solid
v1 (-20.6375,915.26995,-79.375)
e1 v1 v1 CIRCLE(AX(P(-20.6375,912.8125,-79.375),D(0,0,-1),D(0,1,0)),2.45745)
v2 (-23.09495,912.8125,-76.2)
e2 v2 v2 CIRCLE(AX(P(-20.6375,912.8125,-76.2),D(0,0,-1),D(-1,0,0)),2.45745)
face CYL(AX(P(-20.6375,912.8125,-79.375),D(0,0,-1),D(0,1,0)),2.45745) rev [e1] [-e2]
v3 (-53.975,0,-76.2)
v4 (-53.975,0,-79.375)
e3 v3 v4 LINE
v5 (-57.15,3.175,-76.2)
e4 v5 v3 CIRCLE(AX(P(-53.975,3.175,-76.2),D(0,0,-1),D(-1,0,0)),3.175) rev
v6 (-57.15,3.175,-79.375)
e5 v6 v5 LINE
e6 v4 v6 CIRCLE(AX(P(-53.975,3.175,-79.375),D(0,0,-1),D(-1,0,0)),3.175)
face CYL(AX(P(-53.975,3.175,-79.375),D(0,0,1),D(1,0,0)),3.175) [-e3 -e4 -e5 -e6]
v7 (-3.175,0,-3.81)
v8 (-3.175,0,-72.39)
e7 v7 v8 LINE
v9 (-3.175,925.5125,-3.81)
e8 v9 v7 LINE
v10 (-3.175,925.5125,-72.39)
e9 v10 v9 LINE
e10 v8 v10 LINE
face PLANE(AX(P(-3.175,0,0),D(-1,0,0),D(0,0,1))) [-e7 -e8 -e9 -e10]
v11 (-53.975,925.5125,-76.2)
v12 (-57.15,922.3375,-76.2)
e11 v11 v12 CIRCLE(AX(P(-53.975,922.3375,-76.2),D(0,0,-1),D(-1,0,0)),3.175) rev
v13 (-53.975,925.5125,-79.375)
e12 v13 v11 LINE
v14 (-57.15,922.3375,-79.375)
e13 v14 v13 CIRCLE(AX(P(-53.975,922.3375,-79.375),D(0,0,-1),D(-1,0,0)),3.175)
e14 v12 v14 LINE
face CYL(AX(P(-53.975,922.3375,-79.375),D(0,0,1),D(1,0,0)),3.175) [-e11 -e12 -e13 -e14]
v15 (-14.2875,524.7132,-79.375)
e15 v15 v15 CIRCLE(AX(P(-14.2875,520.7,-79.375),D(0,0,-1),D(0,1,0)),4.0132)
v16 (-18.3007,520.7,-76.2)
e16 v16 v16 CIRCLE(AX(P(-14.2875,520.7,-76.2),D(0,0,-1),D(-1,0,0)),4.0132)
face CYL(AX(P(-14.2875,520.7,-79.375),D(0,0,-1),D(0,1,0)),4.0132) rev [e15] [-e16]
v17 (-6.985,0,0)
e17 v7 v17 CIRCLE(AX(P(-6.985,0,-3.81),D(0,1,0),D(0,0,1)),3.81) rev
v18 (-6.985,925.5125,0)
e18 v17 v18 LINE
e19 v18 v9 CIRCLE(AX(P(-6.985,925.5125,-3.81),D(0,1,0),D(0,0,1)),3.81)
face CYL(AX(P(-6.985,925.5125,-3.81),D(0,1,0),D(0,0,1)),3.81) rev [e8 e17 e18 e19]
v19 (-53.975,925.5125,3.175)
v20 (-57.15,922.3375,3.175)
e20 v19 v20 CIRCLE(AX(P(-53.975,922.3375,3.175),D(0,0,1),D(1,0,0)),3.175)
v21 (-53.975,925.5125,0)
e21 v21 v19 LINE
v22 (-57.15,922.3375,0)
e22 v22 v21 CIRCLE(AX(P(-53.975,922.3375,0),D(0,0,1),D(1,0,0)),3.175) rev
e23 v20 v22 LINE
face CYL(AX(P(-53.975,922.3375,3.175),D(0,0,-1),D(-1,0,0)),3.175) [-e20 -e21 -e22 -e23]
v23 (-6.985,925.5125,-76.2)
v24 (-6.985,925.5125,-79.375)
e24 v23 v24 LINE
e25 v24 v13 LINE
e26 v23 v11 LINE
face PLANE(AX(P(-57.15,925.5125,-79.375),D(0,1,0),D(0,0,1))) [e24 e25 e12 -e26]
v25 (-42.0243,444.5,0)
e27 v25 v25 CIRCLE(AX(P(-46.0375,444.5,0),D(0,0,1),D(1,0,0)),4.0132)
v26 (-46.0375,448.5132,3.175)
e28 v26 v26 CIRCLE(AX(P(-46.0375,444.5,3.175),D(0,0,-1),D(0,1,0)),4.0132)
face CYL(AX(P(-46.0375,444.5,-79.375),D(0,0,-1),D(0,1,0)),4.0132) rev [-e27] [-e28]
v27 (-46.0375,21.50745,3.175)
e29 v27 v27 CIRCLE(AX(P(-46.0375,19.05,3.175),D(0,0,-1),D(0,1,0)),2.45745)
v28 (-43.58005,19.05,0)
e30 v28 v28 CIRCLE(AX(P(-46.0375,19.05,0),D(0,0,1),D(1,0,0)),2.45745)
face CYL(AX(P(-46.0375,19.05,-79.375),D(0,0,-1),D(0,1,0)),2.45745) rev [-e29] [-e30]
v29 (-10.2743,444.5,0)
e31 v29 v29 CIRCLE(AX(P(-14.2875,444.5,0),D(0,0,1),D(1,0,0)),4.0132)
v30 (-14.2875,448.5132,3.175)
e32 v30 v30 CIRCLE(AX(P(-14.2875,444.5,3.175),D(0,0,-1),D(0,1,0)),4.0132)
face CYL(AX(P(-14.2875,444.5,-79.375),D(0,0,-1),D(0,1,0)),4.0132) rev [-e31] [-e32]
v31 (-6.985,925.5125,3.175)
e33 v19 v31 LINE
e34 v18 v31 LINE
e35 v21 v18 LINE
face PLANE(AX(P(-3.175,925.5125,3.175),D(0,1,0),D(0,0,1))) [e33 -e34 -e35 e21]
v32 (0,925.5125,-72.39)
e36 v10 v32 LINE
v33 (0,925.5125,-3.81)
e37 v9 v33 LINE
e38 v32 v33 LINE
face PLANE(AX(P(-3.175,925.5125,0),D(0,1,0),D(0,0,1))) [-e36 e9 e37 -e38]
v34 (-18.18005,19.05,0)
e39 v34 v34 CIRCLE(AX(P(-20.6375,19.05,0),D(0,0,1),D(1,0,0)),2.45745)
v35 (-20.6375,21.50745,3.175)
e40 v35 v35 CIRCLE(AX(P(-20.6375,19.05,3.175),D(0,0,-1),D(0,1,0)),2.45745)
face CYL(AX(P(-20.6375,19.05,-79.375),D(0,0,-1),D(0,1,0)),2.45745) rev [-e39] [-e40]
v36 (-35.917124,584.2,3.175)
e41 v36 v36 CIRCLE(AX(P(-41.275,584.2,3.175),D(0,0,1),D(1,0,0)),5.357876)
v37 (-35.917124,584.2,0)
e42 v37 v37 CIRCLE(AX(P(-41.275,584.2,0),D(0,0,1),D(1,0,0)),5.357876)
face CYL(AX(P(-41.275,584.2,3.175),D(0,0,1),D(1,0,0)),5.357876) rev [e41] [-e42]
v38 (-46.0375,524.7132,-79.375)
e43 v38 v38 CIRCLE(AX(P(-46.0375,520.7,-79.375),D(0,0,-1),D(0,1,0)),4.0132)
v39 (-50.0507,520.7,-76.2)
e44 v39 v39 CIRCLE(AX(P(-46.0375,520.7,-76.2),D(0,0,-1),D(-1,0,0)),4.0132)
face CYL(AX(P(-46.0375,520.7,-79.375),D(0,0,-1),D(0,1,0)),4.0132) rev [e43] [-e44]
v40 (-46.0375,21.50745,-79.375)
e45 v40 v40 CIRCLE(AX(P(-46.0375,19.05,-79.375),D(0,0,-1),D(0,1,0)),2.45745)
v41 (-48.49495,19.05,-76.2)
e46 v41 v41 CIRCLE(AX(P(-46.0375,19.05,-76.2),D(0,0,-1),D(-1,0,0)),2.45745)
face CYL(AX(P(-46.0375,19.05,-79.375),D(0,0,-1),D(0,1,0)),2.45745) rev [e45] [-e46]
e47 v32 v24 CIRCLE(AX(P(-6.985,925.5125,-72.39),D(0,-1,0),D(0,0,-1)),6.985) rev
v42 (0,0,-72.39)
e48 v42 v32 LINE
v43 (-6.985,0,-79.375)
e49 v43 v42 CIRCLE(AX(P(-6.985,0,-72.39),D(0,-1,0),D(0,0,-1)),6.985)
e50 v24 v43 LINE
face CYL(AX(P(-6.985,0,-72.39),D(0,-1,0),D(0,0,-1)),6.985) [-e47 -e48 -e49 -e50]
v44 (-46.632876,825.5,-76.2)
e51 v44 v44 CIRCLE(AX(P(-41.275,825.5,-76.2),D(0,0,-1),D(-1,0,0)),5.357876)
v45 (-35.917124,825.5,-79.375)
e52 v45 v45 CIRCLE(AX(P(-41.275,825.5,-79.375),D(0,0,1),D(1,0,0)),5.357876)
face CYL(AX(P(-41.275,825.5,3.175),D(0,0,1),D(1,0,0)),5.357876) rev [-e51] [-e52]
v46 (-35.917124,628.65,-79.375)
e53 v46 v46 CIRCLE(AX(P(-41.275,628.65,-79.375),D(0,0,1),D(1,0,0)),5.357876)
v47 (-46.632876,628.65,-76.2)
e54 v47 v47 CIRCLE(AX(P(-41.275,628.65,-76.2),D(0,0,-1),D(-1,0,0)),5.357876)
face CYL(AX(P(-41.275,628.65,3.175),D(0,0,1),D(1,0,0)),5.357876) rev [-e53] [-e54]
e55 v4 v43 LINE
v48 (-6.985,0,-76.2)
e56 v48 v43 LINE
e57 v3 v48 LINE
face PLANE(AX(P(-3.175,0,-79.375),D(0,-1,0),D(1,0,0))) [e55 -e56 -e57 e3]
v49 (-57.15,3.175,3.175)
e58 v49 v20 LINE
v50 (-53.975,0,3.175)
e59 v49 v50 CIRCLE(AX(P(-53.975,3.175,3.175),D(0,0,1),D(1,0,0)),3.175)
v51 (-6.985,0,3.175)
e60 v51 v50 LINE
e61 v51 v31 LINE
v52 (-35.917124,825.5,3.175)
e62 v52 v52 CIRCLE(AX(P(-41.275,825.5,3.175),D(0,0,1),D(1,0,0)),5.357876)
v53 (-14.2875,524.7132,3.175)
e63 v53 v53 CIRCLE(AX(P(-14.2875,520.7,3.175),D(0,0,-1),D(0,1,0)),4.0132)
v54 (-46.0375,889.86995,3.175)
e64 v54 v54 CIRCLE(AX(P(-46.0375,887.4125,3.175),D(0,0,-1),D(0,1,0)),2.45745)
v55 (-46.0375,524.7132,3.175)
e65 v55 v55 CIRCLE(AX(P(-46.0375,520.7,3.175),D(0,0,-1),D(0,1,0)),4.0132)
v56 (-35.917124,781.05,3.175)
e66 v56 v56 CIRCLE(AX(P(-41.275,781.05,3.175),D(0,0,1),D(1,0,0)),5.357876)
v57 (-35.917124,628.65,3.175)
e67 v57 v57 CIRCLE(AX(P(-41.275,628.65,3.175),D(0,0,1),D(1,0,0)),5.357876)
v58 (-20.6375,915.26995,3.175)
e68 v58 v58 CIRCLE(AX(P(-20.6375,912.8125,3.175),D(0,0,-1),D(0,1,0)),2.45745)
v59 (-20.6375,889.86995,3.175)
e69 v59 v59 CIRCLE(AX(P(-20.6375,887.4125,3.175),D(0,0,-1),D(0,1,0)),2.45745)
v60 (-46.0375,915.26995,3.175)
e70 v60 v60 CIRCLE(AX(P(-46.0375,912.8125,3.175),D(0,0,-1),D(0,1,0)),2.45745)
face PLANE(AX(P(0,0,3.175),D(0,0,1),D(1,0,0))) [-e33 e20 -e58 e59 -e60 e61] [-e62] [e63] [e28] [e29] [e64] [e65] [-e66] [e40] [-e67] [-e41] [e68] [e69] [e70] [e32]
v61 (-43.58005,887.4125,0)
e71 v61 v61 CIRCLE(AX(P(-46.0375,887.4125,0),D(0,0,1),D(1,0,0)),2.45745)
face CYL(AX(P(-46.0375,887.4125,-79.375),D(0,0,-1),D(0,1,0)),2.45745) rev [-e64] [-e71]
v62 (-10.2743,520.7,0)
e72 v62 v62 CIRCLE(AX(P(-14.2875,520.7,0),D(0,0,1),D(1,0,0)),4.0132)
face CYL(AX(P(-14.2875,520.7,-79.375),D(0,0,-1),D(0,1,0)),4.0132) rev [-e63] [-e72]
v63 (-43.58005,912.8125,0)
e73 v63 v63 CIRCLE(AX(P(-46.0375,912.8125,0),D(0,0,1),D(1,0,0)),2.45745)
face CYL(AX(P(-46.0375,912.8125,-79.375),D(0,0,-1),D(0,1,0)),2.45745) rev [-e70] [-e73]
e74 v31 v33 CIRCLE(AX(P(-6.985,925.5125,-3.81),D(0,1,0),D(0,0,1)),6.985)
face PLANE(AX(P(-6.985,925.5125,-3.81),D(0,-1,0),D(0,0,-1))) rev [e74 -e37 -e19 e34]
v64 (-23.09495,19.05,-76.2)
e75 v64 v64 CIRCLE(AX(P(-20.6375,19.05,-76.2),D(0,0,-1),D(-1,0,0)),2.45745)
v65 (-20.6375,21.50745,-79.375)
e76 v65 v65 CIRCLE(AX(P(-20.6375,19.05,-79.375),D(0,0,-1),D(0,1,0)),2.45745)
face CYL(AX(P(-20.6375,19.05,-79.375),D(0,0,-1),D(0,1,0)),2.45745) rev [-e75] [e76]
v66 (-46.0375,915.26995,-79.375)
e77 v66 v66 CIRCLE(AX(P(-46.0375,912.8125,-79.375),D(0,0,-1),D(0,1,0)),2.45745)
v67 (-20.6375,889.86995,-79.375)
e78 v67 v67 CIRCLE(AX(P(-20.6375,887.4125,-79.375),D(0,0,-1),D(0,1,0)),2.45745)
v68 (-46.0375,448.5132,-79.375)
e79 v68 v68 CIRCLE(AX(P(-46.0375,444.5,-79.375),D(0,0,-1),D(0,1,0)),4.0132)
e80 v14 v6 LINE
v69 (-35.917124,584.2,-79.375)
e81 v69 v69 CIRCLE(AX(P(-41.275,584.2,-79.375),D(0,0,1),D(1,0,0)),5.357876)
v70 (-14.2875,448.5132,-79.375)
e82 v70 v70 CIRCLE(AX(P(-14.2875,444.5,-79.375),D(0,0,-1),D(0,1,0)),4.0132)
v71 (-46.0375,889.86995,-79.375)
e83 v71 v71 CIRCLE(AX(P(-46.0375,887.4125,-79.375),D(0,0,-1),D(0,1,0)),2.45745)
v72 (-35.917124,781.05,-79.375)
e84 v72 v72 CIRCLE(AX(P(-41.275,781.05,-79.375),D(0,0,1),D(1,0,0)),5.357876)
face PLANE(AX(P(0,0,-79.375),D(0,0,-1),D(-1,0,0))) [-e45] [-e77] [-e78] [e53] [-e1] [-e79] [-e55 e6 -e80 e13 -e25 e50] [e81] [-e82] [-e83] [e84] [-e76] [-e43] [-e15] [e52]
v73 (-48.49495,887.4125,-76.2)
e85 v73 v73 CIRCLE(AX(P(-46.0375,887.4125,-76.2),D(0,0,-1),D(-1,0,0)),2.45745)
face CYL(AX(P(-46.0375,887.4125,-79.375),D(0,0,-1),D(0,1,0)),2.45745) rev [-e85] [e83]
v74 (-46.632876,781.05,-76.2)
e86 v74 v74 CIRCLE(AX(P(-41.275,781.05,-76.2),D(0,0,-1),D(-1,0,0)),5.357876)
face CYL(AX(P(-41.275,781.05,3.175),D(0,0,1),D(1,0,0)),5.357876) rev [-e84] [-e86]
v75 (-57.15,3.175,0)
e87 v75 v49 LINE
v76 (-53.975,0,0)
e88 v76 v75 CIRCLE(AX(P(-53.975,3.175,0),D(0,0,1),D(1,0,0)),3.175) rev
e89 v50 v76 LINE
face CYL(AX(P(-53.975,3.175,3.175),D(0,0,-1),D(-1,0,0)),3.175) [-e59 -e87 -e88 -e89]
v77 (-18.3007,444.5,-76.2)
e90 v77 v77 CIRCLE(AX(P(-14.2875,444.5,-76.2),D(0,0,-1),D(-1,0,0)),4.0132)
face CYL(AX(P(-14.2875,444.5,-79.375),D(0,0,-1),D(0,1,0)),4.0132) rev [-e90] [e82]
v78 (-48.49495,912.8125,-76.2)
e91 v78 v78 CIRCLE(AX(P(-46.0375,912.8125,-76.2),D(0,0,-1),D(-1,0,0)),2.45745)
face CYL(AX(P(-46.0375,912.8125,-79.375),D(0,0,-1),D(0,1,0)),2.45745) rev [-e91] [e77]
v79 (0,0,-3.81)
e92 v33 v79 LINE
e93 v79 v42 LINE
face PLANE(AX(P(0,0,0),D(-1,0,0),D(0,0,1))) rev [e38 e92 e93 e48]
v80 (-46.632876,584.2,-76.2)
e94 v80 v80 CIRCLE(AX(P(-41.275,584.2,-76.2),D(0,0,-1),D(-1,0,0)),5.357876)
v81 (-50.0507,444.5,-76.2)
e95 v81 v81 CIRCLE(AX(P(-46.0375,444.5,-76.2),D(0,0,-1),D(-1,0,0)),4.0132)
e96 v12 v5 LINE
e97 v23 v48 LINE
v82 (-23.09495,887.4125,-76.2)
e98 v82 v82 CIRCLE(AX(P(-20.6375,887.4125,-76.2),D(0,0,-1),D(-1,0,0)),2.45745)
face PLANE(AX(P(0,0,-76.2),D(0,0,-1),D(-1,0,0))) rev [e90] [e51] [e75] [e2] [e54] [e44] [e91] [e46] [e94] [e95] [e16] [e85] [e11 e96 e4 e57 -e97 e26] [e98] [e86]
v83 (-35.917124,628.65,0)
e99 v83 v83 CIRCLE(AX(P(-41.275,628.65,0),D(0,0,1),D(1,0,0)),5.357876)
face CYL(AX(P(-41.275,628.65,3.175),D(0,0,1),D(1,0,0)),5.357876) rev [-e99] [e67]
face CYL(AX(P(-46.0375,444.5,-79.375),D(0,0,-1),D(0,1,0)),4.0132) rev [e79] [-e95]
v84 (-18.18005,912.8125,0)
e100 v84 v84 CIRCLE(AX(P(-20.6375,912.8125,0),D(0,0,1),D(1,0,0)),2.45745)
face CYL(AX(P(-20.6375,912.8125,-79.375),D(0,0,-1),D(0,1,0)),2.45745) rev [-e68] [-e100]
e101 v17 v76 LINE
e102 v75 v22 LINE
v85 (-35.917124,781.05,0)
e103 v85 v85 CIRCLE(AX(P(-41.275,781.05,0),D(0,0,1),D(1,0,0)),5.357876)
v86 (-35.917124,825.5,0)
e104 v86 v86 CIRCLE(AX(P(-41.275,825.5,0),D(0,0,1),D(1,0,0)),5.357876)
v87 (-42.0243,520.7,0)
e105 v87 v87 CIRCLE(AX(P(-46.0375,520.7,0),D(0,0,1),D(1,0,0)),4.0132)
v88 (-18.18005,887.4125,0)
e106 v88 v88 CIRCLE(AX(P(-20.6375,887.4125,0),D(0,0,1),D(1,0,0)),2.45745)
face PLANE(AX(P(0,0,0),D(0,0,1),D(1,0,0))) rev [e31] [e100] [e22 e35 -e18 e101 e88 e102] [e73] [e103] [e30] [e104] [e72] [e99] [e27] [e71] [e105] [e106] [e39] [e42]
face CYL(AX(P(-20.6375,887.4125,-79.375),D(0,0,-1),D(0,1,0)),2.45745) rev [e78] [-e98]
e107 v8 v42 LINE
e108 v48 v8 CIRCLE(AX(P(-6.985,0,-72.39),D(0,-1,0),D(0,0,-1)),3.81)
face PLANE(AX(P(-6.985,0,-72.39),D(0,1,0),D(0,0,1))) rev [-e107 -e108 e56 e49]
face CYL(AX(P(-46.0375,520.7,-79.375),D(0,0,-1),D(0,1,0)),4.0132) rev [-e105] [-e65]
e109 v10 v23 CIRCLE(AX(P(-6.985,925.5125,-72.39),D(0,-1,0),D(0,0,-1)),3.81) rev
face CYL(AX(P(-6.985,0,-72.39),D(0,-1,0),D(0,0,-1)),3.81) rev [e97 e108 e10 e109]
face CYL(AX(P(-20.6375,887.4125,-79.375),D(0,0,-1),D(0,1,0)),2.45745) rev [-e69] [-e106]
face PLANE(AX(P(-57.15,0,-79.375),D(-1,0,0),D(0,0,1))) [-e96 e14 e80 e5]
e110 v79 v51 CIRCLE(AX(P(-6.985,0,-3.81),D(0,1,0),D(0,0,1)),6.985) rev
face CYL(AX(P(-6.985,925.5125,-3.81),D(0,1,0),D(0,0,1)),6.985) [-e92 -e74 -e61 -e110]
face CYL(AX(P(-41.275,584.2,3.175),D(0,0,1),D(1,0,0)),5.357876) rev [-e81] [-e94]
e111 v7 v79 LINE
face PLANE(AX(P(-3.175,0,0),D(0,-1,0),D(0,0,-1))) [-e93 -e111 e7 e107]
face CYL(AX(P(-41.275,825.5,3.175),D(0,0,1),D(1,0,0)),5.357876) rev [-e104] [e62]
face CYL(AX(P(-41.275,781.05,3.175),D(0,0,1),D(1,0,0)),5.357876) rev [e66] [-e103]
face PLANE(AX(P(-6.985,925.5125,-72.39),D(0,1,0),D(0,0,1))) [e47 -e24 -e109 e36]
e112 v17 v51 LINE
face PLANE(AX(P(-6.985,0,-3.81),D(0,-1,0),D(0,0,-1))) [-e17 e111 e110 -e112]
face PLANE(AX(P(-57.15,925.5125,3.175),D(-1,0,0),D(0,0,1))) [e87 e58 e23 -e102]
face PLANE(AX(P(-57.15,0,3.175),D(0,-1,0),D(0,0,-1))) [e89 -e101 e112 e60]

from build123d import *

# Parameters (mm, degrees)
SKETCH1_W                        = 76.2
SKETCH1_H                        = 925.5125
BASE_FLANGE1_DEPTH               = 3.175
EDGE_FLANGE1_STRIP_W             = 20.32
EDGE_FLANGE1_STRIP_H             = 3.175
EDGE_FLANGE1_STRIP_CUT_DEPTH     = 925.5125
EDGE_FLANGE1_DEPTH               = 925.5125
EDGE_FLANGE2_STRIP_W             = 20.32
EDGE_FLANGE2_STRIP_H             = 3.175
EDGE_FLANGE2_STRIP_CUT_DEPTH     = 925.5125
EDGE_FLANGE2_DEPTH               = 925.5125
F_10_0_1935_DIAMETER_HOLE2_D     = 4.9149
F_10_0_1935_DIAMETER_HOLE1_D     = 4.9149
FILLET1_R                        = 3.175
O_0_316_DIAMETER_HOLE1_D         = 8.0264
F_27_64_0_42188_DIAMETER_HOLE1_D = 10.715752


# Sheet-metal steps are written as plain solids
with BuildPart() as part:
    # Sketch1 → Base-Flange1 (new body)
    with BuildSketch(Plane(origin=(0, 0, 0), x_dir=(0, 0, -1), z_dir=(1, 0, 0))):
        with Locations((38.1, 462.75625)):
            Rectangle(SKETCH1_W, SKETCH1_H)
    extrude(amount=-BASE_FLANGE1_DEPTH)

    # Edge-Flange1 strip (across the edge) → Edge-Flange1 strip cut (cut)
    with BuildSketch(Plane(origin=(-3.175, 0, 0), x_dir=(0, 0, -1), z_dir=(0, 1, 0))):
        with Locations((-6.35, -1.5875)):
            Rectangle(EDGE_FLANGE1_STRIP_W, EDGE_FLANGE1_STRIP_H)
    extrude(amount=EDGE_FLANGE1_STRIP_CUT_DEPTH, mode=Mode.SUBTRACT)

    # Edge-Flange1 section (across the edge) → Edge-Flange1 (add)
    with BuildSketch(Plane(origin=(-3.175, 0, 0), x_dir=(0, 0, -1), z_dir=(0, 1, 0))):
        with BuildLine():
            Line((-3.175, 3.81), (-3.175, 53.975))
            Line((-3.175, 53.975), (0, 53.975))
            Line((0, 53.975), (0, 3.81))
            ThreePointArc((0, 3.81), (1.115923164, 1.115923164), (3.81, 0))
            Line((3.81, 0), (3.81, -3.175))
            ThreePointArc((3.81, -3.175), (-1.129140867, -1.129140867), (-3.175, 3.81))
        make_face()
    extrude(amount=EDGE_FLANGE1_DEPTH)

    # Edge-Flange2 strip (across the edge) → Edge-Flange2 strip cut (cut)
    with BuildSketch(Plane(origin=(-3.175, 925.5125, -76.2), x_dir=(0, 0, 1), z_dir=(0, -1, 0))):
        with Locations((-6.35, -1.5875)):
            Rectangle(EDGE_FLANGE2_STRIP_W, EDGE_FLANGE2_STRIP_H)
    extrude(amount=EDGE_FLANGE2_STRIP_CUT_DEPTH, mode=Mode.SUBTRACT)

    # Edge-Flange2 section (across the edge) → Edge-Flange2 (add)
    with BuildSketch(Plane(origin=(-3.175, 925.5125, -76.2), x_dir=(0, 0, 1), z_dir=(0, -1, 0))):
        with BuildLine():
            Line((-3.175, 3.81), (-3.175, 53.975))
            Line((-3.175, 53.975), (0, 53.975))
            Line((0, 53.975), (0, 3.81))
            ThreePointArc((0, 3.81), (1.115923164, 1.115923164), (3.81, 0))
            Line((3.81, 0), (3.81, -3.175))
            ThreePointArc((3.81, -3.175), (-1.129140867, -1.129140867), (-3.175, 3.81))
        make_face()
    extrude(amount=EDGE_FLANGE2_DEPTH)

    # #10 (0.1935) Diameter Hole2 (through all)
    with Locations(Plane(origin=(0, 0, -79.375), x_dir=(-1, 0, 0), z_dir=(0, 0, -1))):
        with Locations((20.6375, 19.05), (46.0375, 19.05)):
            Hole(F_10_0_1935_DIAMETER_HOLE2_D / 2)

    # #10 (0.1935) Diameter Hole1 (through all)
    with Locations(Plane(origin=(0, 0, -79.375), x_dir=(-1, 0, 0), z_dir=(0, 0, -1))):
        with Locations((46.0375, 912.8125), (20.6375, 912.8125), (20.6375, 887.4125), (46.0375, 887.4125)):
            Hole(F_10_0_1935_DIAMETER_HOLE1_D / 2)

    # Fillet1
    fillet1_edges = [part.edges().sort_by_distance(p)[0] for p in [
        (-57.15, 0, 1.5875),
        (-57.15, 925.5125, 1.5875),
        (-57.15, 925.5125, -77.7875),
        (-57.15, 0, -77.7875),
    ]]
    fillet(fillet1_edges, radius=FILLET1_R)

    # O (0.316) Diameter Hole1 (through all)
    with Locations(Plane(origin=(0, 0, -79.375), x_dir=(-1, 0, 0), z_dir=(0, 0, -1))):
        with Locations((14.2875, 520.7), (14.2875, 444.5), (46.0375, 520.7), (46.0375, 444.5)):
            Hole(O_0_316_DIAMETER_HOLE1_D / 2)

    # 27/64 (0.42188) Diameter Hole1 (through all)
    with Locations(Plane.XY.offset(3.175)):
        with Locations((-41.275, 825.5), (-41.275, 781.05), (-41.275, 628.65), (-41.275, 584.2)):
            Hole(F_27_64_0_42188_DIAMETER_HOLE1_D / 2)


solid = part.part
